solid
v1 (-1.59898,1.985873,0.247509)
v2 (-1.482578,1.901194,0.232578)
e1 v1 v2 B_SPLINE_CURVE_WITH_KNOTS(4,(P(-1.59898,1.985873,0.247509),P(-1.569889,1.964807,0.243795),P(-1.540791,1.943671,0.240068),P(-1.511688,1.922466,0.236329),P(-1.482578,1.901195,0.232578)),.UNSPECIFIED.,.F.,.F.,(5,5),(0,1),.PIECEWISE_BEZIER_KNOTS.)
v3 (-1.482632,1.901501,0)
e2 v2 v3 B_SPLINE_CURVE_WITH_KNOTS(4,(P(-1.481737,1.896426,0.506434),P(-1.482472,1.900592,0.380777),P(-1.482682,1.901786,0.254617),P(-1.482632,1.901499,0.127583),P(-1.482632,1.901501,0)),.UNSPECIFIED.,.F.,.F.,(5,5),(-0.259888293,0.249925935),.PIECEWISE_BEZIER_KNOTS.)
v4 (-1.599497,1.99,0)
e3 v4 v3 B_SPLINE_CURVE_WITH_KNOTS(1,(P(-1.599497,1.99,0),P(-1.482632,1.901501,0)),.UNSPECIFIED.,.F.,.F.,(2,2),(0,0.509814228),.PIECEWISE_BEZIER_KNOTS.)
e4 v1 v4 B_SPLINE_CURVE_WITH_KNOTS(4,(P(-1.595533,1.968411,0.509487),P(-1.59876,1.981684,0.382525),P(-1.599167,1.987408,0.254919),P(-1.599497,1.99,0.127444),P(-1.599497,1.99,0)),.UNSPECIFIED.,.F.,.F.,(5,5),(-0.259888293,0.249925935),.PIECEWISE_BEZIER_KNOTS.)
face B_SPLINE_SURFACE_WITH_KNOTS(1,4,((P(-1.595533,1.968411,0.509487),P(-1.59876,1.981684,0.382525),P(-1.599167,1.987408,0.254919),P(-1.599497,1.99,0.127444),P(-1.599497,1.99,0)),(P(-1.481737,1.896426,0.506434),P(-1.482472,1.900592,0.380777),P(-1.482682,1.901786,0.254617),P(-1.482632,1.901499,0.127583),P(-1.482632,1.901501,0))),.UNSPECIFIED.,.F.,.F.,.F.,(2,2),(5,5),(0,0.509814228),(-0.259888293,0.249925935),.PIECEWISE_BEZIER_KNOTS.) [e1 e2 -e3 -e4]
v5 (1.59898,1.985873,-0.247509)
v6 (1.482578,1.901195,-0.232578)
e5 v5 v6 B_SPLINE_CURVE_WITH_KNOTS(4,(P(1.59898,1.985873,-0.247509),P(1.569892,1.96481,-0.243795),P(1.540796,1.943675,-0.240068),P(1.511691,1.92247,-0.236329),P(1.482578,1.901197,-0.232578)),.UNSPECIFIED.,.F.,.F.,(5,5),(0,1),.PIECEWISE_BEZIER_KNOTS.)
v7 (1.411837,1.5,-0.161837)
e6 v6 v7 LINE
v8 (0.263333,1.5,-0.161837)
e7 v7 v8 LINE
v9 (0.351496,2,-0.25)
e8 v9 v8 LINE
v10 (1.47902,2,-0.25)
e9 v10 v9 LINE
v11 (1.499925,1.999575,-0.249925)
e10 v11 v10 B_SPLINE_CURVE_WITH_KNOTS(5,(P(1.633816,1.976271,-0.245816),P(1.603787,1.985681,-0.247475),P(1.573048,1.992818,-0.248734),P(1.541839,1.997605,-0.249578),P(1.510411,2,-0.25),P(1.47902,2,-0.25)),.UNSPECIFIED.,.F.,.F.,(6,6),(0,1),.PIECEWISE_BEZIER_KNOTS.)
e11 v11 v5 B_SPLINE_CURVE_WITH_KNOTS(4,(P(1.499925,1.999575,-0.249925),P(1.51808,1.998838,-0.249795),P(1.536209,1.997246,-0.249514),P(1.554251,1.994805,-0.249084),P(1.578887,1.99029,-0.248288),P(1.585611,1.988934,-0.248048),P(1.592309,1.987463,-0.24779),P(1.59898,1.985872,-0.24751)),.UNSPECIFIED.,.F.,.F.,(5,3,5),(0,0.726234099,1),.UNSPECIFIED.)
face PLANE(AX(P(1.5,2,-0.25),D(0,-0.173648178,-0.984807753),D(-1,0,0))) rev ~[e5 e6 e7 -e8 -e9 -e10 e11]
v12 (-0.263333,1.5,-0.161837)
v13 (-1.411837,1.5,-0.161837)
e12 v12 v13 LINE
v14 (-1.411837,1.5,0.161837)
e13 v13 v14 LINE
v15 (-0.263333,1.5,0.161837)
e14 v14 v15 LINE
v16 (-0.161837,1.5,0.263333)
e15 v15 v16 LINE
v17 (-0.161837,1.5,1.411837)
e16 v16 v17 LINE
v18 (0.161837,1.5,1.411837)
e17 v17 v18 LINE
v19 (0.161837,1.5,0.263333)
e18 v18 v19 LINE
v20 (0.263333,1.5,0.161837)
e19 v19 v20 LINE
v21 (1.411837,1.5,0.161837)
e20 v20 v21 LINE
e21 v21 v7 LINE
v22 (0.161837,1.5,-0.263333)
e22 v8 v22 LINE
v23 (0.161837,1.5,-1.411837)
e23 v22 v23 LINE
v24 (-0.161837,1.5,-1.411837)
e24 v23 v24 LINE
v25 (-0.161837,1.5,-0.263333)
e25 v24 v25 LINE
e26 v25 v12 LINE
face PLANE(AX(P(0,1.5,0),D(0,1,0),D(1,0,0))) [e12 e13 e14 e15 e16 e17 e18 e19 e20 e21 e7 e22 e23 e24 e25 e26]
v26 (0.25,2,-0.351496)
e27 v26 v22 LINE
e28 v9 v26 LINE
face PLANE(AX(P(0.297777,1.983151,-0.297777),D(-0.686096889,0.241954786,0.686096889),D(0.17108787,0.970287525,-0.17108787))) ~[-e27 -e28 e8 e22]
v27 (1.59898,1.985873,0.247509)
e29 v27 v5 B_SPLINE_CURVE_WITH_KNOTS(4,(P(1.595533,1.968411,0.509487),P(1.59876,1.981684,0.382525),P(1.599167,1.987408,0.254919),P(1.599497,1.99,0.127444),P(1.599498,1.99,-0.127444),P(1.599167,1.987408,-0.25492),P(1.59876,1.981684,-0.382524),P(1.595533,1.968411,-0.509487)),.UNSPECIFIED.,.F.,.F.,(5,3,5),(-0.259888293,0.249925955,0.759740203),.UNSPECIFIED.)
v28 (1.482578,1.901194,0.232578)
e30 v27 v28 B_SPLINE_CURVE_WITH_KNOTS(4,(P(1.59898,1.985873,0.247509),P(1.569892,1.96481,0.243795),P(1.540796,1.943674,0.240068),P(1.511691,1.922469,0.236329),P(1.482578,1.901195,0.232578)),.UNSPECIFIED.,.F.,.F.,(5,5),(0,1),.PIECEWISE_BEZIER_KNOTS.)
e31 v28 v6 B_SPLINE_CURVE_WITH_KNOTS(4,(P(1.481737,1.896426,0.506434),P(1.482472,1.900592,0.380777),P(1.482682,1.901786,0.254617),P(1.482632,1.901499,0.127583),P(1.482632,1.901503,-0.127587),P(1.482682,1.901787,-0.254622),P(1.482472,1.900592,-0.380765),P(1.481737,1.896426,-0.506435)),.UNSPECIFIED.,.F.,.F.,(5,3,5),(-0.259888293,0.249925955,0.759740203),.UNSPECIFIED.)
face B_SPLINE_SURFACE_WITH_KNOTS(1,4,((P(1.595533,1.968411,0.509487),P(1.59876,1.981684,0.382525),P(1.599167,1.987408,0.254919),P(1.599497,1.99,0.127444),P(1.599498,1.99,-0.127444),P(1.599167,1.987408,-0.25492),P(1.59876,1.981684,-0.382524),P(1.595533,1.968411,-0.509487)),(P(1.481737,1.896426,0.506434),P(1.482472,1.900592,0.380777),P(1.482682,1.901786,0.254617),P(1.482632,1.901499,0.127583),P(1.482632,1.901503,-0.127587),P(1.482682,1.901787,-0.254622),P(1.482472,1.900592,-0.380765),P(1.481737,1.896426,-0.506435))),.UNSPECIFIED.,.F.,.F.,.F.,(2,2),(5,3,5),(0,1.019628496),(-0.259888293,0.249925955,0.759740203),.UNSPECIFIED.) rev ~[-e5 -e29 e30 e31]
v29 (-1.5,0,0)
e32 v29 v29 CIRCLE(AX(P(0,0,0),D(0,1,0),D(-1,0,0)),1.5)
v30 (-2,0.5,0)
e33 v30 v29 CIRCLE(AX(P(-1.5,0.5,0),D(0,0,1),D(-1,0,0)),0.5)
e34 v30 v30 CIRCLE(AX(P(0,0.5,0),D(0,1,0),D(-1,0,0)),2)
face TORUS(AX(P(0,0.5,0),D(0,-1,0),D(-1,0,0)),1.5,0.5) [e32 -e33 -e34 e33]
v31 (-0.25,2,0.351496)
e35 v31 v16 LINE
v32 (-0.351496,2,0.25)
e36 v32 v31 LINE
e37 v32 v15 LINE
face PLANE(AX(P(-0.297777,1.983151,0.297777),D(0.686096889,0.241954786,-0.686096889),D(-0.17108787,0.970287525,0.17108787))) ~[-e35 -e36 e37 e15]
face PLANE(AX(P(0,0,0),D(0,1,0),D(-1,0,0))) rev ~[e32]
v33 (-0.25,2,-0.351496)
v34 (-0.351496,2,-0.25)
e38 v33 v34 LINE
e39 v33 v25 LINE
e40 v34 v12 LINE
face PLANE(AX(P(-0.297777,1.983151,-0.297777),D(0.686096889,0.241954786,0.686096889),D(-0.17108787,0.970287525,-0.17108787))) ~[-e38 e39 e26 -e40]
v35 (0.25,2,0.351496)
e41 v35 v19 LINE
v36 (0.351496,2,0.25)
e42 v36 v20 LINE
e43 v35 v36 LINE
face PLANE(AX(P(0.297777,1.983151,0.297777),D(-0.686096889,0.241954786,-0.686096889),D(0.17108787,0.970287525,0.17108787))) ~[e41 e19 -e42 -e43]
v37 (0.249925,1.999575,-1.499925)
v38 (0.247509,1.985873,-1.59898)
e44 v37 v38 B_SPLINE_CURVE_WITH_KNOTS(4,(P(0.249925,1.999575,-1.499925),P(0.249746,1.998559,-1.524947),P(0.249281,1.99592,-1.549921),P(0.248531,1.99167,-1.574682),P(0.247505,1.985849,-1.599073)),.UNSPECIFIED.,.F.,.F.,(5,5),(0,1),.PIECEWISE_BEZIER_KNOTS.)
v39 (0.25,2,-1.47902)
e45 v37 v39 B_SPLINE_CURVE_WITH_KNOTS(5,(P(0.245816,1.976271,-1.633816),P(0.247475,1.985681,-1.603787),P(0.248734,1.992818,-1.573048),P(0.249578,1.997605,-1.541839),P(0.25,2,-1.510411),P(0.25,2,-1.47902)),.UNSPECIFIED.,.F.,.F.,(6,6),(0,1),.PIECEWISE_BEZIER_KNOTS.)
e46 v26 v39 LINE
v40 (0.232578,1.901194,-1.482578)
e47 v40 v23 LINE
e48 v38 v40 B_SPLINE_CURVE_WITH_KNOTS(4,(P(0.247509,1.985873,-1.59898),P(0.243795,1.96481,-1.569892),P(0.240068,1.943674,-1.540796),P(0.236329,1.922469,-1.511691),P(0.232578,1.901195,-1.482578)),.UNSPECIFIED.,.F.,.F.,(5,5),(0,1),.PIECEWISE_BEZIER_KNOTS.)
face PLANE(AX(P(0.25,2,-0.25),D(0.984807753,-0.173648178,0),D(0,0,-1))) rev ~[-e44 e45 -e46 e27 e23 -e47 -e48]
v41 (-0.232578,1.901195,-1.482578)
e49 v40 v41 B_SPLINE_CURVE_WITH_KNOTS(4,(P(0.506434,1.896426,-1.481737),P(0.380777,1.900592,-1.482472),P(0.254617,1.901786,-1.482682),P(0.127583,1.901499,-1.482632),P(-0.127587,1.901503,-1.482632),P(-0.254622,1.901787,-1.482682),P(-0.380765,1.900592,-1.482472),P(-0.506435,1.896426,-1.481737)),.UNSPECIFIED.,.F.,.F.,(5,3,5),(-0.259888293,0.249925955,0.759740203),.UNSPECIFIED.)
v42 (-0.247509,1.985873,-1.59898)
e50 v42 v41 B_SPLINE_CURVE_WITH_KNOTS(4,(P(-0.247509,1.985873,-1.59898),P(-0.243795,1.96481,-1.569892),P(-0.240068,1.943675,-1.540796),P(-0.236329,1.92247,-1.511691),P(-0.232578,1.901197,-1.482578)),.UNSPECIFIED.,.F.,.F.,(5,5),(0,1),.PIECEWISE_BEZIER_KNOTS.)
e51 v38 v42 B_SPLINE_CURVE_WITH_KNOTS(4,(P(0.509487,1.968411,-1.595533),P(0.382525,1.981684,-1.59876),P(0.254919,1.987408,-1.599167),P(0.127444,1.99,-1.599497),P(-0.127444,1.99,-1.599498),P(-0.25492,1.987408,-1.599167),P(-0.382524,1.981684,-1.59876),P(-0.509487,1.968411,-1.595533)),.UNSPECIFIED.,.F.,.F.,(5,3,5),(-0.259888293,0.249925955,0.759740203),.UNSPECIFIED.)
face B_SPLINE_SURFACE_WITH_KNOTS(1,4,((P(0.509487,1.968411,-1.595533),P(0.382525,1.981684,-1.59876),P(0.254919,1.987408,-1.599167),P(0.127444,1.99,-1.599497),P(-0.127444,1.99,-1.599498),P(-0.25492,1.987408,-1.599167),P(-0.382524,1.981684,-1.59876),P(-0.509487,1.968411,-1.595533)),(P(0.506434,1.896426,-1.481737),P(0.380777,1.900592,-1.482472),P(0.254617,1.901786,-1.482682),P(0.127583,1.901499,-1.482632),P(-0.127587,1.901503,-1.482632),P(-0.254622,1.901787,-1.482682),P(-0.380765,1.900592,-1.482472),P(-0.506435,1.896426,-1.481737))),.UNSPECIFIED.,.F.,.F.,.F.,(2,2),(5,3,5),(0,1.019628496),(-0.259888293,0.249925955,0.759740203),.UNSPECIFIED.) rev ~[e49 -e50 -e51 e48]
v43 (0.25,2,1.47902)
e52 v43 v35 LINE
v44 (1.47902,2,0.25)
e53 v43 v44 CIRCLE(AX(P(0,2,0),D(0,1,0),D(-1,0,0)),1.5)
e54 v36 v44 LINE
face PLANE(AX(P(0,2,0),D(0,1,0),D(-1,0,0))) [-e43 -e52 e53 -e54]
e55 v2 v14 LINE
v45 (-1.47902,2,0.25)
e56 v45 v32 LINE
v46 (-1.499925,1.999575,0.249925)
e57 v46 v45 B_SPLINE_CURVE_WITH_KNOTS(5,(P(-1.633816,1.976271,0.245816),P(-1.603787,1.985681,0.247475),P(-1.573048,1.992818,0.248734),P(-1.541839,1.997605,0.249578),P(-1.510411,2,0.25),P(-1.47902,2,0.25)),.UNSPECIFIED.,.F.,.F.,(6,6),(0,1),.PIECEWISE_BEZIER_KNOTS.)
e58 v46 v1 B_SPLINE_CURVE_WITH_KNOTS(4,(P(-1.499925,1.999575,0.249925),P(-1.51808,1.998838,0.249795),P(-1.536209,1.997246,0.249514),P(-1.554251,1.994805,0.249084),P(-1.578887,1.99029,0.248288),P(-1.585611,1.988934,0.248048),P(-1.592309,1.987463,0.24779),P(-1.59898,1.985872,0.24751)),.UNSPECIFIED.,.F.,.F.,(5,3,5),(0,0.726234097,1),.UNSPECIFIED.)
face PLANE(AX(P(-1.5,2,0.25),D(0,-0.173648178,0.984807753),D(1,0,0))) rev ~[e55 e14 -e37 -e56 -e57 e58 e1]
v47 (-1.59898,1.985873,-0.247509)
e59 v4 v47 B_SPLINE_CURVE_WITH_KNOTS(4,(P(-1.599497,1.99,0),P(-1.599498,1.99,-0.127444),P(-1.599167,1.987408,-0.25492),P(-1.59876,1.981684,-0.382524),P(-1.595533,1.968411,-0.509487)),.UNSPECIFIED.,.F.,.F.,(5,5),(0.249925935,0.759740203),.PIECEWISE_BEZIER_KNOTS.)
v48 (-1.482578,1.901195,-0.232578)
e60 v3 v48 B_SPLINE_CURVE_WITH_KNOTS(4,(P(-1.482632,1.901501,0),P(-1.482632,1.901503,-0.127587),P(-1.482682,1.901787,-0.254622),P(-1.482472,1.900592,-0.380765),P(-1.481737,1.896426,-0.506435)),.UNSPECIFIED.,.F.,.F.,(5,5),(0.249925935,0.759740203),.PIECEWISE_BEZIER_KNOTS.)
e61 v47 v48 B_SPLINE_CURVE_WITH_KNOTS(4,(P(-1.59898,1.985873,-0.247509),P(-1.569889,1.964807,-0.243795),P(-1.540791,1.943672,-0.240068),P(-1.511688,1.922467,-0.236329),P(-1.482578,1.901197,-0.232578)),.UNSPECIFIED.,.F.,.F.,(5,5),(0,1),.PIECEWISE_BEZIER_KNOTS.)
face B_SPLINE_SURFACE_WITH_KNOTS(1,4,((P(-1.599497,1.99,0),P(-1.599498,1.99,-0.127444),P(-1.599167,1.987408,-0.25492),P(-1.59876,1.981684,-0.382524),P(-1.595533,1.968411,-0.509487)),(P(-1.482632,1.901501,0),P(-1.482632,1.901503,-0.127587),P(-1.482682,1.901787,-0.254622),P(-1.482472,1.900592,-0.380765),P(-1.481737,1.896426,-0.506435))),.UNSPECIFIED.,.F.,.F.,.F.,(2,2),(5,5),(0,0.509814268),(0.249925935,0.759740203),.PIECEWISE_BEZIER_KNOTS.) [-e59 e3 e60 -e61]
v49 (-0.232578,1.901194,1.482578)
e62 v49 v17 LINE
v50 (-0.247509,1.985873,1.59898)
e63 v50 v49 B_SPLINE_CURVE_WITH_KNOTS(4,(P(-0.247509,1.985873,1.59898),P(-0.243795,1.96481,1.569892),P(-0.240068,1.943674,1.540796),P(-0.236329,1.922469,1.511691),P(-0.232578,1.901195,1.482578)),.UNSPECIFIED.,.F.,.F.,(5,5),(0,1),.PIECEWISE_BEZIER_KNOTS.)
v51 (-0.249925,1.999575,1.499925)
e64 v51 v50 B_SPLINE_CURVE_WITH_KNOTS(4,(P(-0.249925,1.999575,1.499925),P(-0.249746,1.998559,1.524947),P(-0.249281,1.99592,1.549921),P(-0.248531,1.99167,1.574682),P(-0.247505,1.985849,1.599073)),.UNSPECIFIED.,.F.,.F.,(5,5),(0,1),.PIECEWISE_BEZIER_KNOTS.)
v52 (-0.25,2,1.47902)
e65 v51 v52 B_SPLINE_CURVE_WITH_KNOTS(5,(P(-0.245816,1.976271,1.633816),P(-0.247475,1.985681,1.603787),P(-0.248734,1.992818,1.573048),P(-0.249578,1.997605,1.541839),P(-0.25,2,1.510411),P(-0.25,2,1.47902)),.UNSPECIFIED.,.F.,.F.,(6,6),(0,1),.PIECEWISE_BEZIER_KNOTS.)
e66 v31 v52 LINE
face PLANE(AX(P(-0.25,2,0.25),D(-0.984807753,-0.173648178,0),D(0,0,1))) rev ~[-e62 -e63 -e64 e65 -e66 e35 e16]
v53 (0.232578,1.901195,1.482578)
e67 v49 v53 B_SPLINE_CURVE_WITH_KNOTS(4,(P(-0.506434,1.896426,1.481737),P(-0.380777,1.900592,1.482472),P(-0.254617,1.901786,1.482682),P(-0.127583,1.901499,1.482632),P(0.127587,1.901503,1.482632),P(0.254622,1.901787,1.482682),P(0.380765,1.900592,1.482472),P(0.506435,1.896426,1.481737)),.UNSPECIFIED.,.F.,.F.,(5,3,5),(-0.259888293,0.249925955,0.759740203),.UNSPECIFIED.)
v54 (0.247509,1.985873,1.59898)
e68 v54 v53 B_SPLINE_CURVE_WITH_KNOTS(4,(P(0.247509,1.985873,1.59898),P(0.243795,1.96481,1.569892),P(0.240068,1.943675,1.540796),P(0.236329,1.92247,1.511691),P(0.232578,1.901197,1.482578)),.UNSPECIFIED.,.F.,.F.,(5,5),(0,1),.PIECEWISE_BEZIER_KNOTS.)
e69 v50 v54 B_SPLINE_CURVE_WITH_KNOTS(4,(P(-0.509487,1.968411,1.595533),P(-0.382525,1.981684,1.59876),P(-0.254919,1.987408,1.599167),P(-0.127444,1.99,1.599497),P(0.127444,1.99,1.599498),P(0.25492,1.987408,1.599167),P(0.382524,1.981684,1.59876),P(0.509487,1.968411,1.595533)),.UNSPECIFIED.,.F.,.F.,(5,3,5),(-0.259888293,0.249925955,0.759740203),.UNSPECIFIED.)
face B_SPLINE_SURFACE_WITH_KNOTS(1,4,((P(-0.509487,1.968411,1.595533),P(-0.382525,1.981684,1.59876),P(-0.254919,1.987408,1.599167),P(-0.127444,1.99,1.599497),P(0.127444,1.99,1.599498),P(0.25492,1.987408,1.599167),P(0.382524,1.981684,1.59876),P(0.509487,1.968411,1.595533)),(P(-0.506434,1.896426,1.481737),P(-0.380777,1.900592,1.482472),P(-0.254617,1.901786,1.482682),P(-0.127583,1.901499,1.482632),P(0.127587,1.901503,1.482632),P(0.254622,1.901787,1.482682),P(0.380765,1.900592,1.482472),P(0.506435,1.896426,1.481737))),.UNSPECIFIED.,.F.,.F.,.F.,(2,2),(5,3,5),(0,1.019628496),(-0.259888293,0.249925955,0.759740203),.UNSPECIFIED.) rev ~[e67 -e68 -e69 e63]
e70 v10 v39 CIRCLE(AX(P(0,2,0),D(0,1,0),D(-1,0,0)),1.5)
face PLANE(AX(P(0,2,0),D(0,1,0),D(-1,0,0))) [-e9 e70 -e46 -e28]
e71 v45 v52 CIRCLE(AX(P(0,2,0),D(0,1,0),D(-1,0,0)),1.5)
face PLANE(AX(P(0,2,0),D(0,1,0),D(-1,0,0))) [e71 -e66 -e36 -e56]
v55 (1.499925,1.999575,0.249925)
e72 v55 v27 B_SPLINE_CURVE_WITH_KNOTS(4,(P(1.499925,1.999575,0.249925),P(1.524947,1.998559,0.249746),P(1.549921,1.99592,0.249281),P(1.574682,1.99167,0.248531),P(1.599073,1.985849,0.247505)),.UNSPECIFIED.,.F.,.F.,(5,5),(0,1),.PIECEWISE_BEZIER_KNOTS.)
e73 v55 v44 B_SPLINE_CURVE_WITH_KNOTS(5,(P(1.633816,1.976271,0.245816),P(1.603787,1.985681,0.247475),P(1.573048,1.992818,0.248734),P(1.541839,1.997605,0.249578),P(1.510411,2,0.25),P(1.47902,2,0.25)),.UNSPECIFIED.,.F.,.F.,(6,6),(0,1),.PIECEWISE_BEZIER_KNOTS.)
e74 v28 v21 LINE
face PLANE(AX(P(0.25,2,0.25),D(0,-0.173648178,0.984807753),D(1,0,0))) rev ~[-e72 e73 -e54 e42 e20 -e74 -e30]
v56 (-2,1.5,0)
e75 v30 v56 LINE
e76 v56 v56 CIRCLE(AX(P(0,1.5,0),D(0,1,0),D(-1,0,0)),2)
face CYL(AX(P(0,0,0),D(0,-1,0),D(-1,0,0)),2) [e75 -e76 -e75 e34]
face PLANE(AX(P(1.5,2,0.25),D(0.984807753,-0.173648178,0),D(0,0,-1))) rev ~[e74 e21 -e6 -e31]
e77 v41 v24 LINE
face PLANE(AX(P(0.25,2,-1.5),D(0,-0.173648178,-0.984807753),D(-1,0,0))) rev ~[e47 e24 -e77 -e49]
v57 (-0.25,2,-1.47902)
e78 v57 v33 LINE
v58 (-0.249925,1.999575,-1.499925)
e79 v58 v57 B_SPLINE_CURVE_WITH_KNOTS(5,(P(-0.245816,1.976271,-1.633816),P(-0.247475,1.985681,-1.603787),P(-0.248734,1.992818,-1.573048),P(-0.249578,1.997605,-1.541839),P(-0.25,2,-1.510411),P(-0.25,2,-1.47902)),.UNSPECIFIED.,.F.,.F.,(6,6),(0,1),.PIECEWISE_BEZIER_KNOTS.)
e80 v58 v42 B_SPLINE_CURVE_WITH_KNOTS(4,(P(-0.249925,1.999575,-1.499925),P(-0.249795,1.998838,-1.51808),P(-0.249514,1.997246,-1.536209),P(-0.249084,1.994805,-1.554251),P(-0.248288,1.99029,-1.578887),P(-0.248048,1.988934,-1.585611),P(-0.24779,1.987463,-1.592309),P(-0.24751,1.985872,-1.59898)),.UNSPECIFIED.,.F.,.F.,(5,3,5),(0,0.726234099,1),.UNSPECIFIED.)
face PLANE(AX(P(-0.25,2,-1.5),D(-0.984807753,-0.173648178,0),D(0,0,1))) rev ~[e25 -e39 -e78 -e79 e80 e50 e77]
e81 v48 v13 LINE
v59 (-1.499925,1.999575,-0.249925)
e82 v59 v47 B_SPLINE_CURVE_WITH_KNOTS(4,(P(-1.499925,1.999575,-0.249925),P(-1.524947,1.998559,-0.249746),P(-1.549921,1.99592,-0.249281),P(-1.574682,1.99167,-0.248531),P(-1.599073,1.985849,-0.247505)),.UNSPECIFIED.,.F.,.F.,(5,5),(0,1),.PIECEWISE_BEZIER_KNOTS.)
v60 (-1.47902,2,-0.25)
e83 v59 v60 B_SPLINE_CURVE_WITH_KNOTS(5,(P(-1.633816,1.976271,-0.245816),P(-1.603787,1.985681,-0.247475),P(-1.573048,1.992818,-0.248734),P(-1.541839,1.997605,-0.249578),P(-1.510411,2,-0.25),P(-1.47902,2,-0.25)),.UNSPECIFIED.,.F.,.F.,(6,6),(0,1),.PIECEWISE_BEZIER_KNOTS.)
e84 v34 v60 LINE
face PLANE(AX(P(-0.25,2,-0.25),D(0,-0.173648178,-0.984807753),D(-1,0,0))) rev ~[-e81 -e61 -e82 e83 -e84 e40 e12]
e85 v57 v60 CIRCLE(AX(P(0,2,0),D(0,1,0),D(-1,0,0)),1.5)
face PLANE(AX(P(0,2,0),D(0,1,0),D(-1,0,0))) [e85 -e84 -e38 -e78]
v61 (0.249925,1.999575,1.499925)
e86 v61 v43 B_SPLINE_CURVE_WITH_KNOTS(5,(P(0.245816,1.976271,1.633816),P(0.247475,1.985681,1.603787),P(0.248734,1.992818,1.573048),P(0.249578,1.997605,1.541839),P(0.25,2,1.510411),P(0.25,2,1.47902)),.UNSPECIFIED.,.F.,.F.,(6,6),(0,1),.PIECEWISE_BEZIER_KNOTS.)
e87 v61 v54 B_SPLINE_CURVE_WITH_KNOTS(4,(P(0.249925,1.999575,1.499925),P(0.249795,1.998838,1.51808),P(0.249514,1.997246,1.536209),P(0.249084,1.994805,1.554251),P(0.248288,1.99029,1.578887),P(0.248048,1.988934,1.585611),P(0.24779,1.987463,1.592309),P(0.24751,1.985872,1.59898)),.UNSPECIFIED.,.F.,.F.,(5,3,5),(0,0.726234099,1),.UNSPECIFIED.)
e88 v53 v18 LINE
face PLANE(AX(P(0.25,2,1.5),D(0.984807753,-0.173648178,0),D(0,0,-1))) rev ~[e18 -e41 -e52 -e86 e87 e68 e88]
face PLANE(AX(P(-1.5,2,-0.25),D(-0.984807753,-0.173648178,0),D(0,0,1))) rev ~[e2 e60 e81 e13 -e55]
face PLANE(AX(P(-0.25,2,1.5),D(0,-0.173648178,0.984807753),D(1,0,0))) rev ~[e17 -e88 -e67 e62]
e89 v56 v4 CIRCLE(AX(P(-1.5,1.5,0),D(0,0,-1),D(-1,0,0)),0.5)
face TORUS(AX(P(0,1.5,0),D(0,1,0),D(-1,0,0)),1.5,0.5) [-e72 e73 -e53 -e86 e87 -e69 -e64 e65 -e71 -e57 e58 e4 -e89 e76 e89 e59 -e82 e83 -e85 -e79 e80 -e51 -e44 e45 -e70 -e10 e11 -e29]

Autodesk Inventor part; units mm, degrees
ref_plane "YZ Plane" through (0, 0, 0) normal (1, 0, 0) x (0, 1, 0)
ref_plane "XZ Plane" through (0, 0, 0) normal (0, 1, 0) x (-1, 0, 0)
ref_plane "XY Plane" through (0, 0, 0) normal (0, 0, 1) x (1, 0, 0)
sketch "Sketch1" plane through (0, 0, 0) normal (0, 1, 0) x (-1, 0, 0)
  circle A0 centre (0, 0) radius 2
  dimension "d0" = 4
extrude "Extrusion1" add sketch "Sketch1" along normal blind 2
fillet "Fillet1" radius 0.5 2 edges at (2, 2, 0) (2, 0, 0)
sketch "Sketch2" plane through (0, 2, 0) normal (0, 1, 0) x (1, 0, 0)
  line L0 (0.25, 1.5) -> (-0.25, 1.5)
  line L1 (-0.25, -1.5) -> (0.25, -1.5)
  line L2 (0.25, -1.5) -> (-0.25, 1.5) construction
  line L3 (0.25, 1.5) -> (-0.25, -1.5) construction
  line L4 (0.25, 1.5) -> (-0.25, 1.5)
  line L5 (-0.25, -1.5) -> (0.25, -1.5)
  line L6 (0.25, -1.5) -> (-0.25, 1.5) construction
  line L7 (0.25, 1.5) -> (-0.25, -1.5) construction
  line L8 (1.5, -0.25) -> (1.5, 0.25)
  line L9 (-1.5, 0.25) -> (-1.5, -0.25)
  line L10 (-1.5, -0.25) -> (1.5, 0.25) construction
  line L11 (1.5, -0.25) -> (-1.5, 0.25) construction
  line L12 (1.5, -0.25) -> (1.5, 0.25)
  line L13 (-1.5, 0.25) -> (-1.5, -0.25)
  line L14 (-1.5, -0.25) -> (1.5, 0.25) construction
  line L15 (1.5, -0.25) -> (-1.5, 0.25) construction
  line L16 (-0.25, 1.5) -> (-0.25, 0.25)
  line L17 (-0.25, -0.25) -> (-0.25, -1.5)
  line L18 (-1.5, -0.25) -> (-0.25, -0.25)
  line L19 (0.25, -0.25) -> (1.5, -0.25)
  line L20 (0.25, -1.5) -> (0.25, -0.25)
  line L21 (0.25, 0.25) -> (0.25, 1.5)
  line L22 (1.5, 0.25) -> (0.25, 0.25)
  line L23 (-0.25, 0.25) -> (-1.5, 0.25)
  line L24 (-1.5, -0.25) -> (-0.25, -0.25)
  line L25 (0.25, -0.25) -> (1.5, -0.25)
  line L26 (0.25, -1.5) -> (0.25, -0.25)
  line L27 (0.25, 0.25) -> (0.25, 1.5)
  line L28 (1.5, 0.25) -> (0.25, 0.25)
  line L29 (-0.25, 0.25) -> (-1.5, 0.25)
  line L30 (-0.25, 1.5) -> (-0.25, 0.25)
  line L31 (-0.25, -0.25) -> (-0.25, -1.5)
  point P0 (0, 0)
  point P1 (0, 0)
  dimension "d5" = 0.5
  dimension "d8" = 3
  dimension "d9" = 0.5
  dimension "d10" = 3
extrude "Extrusion2" cut sketch "Sketch2" against normal blind 0.5 draft -10
chamfer "Chamfer1" distance 0.1 angle 45 12 edges at (-1.5, 2, 0.1259) (-1.5, 2, -0.1259) (-0.2059, 1.75, 0.2059) (-0.2059, 1.75, -0.2059) (0.2059, 1.75, -0.2059) (0.2059, 1.75, 0.2059) (0.1259, 2, -1.5) (-0.1259, 2, -1.5) (1.5, 2, 0.1259) (1.5, 2, -0.1259) (-0.1259, 2, 1.5) (0.1259, 2, 1.5)
properties part number "Kepala Baut"
